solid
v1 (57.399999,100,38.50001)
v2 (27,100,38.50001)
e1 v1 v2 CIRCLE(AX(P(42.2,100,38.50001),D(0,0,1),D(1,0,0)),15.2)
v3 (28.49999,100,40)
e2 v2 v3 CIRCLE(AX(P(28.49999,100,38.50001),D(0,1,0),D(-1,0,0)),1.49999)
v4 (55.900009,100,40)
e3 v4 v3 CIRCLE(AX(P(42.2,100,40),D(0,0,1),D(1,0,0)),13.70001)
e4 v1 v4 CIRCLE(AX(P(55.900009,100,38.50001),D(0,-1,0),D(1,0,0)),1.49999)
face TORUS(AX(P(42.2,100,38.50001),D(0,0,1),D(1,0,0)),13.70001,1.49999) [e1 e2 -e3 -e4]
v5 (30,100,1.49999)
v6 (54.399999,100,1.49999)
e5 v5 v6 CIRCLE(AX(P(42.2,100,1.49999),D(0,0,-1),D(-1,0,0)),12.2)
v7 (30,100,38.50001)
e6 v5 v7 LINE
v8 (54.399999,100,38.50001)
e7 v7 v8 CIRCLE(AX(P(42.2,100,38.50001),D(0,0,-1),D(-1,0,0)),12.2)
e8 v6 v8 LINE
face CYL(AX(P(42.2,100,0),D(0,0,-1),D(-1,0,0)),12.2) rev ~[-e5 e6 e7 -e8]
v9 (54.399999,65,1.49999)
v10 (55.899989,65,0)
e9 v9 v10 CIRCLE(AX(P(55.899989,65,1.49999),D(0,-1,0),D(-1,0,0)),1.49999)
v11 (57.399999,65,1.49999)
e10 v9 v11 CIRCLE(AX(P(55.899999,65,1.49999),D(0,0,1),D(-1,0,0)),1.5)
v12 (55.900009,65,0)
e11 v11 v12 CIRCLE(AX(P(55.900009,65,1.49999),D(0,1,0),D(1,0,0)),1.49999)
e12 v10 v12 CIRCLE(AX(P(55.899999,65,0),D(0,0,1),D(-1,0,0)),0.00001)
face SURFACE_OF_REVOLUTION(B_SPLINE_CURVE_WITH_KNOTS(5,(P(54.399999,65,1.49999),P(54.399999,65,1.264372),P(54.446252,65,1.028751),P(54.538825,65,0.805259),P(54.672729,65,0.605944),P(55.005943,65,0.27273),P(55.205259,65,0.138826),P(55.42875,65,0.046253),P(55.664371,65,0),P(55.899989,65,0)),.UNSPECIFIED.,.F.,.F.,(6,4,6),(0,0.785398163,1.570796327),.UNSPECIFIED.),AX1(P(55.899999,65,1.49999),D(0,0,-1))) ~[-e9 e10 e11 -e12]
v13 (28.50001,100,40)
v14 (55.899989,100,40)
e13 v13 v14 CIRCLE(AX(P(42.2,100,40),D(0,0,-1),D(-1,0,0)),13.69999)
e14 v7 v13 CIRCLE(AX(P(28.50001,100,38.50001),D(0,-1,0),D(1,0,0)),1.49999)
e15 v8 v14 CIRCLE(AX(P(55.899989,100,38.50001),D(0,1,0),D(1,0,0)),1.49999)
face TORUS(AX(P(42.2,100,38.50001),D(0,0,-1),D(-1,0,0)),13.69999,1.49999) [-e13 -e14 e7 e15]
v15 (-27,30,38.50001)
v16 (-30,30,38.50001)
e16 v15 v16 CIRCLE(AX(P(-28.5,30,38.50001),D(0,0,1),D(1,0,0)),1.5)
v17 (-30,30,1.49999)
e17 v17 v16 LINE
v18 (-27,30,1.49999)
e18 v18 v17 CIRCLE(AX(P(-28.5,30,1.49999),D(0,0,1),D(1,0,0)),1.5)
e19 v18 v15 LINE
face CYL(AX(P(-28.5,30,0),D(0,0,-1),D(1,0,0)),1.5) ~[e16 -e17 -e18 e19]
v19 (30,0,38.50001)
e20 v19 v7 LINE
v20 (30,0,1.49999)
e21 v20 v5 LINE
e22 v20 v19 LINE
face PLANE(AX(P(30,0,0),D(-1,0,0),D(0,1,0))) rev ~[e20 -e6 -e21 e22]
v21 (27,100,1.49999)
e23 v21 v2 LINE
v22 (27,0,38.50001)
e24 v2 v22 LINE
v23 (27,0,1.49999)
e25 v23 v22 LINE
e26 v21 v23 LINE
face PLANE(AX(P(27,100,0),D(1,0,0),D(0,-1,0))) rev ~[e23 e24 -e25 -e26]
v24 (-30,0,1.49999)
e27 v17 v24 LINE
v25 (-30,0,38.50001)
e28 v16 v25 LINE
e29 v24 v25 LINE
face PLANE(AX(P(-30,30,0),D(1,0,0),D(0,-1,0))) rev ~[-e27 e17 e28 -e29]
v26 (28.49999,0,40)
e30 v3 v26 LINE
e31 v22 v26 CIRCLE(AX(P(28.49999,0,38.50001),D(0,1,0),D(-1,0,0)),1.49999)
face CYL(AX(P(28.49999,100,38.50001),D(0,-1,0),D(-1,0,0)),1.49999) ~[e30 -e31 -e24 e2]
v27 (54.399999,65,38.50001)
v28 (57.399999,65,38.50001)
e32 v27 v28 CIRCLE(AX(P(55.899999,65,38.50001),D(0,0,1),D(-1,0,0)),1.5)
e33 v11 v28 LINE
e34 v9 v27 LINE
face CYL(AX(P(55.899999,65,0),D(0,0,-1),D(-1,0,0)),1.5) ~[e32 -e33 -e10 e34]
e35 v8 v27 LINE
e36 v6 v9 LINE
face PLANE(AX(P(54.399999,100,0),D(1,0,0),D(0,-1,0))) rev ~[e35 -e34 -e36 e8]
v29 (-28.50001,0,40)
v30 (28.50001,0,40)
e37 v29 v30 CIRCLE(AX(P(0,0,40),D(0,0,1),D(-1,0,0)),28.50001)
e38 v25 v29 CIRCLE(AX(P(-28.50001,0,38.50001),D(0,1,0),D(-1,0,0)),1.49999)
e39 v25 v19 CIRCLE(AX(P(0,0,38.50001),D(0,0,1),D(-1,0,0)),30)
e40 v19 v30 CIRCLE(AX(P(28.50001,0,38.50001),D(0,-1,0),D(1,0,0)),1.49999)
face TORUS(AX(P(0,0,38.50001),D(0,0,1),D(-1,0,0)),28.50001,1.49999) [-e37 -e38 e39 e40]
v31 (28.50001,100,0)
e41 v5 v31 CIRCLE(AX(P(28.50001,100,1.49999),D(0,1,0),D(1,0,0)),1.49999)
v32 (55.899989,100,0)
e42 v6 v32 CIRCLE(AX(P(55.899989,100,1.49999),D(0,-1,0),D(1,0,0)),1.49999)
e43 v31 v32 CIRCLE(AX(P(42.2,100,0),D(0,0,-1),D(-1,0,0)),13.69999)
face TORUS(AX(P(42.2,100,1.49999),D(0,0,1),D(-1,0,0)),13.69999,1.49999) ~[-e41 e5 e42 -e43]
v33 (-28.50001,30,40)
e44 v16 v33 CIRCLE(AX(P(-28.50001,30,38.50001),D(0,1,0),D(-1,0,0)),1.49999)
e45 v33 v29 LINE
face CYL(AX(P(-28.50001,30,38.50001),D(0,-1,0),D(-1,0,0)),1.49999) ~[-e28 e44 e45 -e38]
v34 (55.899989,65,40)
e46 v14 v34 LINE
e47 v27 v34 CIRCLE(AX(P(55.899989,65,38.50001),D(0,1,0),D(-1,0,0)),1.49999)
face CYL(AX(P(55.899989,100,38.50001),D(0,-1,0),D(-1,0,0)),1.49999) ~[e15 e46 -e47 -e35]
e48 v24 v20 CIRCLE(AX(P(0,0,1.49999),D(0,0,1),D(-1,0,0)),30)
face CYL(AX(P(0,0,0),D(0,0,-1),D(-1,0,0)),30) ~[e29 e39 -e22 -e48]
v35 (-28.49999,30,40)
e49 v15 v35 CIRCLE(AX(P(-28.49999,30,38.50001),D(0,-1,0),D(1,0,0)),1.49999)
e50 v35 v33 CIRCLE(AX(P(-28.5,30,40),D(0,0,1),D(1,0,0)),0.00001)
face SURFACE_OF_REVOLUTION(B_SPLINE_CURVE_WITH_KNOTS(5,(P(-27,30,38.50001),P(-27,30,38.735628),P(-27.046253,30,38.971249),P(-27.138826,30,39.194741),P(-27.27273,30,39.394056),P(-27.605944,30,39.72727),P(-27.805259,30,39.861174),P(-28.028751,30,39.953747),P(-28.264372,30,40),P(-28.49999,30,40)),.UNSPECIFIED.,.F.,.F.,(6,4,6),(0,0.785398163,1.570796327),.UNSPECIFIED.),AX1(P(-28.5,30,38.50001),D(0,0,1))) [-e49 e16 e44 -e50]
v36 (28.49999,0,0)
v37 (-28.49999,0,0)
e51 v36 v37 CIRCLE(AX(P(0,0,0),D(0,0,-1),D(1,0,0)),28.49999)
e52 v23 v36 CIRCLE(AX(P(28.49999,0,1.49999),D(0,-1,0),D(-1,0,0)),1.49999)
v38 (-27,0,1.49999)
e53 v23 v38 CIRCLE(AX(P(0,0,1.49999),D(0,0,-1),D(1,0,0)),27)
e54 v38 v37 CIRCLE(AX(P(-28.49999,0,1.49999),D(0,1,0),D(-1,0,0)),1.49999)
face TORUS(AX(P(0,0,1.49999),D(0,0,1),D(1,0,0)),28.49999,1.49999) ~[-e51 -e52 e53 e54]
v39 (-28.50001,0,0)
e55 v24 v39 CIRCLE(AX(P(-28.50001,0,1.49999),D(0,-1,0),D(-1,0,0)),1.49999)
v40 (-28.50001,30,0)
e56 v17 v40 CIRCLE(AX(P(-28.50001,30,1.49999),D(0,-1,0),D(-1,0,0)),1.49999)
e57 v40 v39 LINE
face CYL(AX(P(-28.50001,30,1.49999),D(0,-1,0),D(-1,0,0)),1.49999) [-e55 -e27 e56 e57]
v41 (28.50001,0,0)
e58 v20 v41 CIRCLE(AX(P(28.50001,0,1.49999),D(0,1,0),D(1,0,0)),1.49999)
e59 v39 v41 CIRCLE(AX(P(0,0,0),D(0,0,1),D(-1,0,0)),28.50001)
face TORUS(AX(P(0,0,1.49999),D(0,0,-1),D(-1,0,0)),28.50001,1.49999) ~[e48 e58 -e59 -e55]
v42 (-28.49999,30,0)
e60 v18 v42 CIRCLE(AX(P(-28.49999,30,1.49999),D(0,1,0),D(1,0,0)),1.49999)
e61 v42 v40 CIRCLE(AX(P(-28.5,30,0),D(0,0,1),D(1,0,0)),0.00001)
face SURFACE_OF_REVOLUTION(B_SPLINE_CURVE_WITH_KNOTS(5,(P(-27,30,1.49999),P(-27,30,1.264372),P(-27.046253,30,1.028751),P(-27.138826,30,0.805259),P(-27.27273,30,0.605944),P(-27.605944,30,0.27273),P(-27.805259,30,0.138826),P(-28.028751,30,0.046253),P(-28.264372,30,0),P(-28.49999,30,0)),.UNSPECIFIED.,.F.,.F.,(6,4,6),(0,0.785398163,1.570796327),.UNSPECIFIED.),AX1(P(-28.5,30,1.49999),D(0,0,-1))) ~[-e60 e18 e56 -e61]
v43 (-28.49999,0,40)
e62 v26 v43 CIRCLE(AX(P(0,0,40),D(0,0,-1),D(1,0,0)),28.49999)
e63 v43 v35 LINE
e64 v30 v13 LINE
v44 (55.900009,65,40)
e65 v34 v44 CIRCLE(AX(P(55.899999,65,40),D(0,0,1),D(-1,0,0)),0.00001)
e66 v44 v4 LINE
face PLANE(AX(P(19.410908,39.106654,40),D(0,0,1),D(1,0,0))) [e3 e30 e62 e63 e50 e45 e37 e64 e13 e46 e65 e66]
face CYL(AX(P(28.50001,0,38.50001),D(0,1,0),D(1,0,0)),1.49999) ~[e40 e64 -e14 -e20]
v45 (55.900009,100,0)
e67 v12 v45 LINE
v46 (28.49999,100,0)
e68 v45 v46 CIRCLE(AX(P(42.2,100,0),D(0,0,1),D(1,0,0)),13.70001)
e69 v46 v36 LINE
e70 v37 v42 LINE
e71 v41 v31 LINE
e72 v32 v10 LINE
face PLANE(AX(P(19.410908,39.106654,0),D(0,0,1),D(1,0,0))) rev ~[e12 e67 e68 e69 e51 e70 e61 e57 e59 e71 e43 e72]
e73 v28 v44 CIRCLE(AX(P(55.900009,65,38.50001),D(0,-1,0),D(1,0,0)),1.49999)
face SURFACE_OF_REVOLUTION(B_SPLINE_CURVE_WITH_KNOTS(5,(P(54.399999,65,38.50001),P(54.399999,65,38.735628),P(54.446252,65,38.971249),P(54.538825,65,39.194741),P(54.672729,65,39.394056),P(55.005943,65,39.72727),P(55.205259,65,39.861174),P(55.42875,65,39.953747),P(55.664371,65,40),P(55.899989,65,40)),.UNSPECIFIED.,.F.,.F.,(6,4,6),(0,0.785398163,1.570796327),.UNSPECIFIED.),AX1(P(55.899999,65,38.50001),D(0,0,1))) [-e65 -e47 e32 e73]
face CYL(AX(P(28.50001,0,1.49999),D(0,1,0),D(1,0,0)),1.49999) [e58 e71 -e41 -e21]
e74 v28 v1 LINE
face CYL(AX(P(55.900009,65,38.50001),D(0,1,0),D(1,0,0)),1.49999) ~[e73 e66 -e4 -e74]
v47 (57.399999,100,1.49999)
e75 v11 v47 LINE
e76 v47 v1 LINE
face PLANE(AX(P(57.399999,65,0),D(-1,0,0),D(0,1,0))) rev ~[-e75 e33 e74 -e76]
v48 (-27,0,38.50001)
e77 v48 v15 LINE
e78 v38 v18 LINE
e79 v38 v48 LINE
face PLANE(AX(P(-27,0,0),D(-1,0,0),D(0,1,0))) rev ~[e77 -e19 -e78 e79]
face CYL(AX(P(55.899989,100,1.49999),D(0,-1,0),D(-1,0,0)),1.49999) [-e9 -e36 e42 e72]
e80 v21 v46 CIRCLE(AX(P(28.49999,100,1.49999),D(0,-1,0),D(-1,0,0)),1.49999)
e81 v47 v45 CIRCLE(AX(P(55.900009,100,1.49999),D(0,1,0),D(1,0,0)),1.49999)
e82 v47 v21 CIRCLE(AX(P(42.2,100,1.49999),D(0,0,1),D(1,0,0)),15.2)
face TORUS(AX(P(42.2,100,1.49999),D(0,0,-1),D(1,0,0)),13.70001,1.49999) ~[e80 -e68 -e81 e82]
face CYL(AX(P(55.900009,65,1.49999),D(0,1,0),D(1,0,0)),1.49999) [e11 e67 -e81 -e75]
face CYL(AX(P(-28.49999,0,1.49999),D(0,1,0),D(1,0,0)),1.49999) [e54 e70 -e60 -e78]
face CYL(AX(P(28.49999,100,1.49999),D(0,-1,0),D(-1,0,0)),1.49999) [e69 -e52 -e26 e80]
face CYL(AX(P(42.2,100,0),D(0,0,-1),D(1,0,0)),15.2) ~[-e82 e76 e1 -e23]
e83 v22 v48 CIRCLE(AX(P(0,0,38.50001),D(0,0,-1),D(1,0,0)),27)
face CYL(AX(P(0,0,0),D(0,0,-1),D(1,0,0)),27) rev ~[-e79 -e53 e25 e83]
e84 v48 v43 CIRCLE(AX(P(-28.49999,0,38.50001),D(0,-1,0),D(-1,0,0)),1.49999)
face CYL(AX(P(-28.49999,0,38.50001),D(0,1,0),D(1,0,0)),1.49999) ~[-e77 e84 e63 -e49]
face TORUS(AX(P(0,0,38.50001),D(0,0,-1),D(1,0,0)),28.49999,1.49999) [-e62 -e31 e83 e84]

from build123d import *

# Parameters (mm, degrees)
F1_DEPTH = 40
F2_R     = 1.49999


# Not quite as in the source:
# - a fillet or chamfer is up to 0.001 mm smaller than in the source, because OpenCascade refuses the exact size


with BuildPart() as f1:
    # F0 (on Top) → F1 (new body)
    with BuildSketch(Plane.XY):
        with BuildLine():
            ThreePointArc((-30, 0), (0, -30), (30, 0))
            Line((30, 0), (30, 100))
            ThreePointArc((30, 100), (42.1999996752, 112.1999996752), (54.3999993503, 100))
            Line((54.3999993503, 100), (54.3999993503, 65))
            ThreePointArc((54.3999993503, 65), (55.8999993503, 63.5), (57.3999993503, 65))
            Line((57.3999993503, 65), (57.3999993503, 100))
            ThreePointArc((57.3999993503, 100), (42.1999996752, 115.1999996752), (27, 100))
            Line((27, 100), (27, 0))
            ThreePointArc((27, 0), (0, -27), (-27, 0))
            Line((-27, 0), (-27, 30))
            ThreePointArc((-27, 30), (-28.5, 31.5), (-30, 30))
            Line((-30, 30), (-30, 0))
        make_face()
    extrude(amount=F1_DEPTH)

    # F2 (radius 1.5 in the source; OpenCascade refuses exactly that, so slightly less here)
    f2_edges = [f1.edges().sort_by_distance(p)[0] for p in [
        (-30, 15, 40),
        (-30, 15, 0),
    ]]
    fillet(f2_edges, radius=F2_R)


solid = f1.part
